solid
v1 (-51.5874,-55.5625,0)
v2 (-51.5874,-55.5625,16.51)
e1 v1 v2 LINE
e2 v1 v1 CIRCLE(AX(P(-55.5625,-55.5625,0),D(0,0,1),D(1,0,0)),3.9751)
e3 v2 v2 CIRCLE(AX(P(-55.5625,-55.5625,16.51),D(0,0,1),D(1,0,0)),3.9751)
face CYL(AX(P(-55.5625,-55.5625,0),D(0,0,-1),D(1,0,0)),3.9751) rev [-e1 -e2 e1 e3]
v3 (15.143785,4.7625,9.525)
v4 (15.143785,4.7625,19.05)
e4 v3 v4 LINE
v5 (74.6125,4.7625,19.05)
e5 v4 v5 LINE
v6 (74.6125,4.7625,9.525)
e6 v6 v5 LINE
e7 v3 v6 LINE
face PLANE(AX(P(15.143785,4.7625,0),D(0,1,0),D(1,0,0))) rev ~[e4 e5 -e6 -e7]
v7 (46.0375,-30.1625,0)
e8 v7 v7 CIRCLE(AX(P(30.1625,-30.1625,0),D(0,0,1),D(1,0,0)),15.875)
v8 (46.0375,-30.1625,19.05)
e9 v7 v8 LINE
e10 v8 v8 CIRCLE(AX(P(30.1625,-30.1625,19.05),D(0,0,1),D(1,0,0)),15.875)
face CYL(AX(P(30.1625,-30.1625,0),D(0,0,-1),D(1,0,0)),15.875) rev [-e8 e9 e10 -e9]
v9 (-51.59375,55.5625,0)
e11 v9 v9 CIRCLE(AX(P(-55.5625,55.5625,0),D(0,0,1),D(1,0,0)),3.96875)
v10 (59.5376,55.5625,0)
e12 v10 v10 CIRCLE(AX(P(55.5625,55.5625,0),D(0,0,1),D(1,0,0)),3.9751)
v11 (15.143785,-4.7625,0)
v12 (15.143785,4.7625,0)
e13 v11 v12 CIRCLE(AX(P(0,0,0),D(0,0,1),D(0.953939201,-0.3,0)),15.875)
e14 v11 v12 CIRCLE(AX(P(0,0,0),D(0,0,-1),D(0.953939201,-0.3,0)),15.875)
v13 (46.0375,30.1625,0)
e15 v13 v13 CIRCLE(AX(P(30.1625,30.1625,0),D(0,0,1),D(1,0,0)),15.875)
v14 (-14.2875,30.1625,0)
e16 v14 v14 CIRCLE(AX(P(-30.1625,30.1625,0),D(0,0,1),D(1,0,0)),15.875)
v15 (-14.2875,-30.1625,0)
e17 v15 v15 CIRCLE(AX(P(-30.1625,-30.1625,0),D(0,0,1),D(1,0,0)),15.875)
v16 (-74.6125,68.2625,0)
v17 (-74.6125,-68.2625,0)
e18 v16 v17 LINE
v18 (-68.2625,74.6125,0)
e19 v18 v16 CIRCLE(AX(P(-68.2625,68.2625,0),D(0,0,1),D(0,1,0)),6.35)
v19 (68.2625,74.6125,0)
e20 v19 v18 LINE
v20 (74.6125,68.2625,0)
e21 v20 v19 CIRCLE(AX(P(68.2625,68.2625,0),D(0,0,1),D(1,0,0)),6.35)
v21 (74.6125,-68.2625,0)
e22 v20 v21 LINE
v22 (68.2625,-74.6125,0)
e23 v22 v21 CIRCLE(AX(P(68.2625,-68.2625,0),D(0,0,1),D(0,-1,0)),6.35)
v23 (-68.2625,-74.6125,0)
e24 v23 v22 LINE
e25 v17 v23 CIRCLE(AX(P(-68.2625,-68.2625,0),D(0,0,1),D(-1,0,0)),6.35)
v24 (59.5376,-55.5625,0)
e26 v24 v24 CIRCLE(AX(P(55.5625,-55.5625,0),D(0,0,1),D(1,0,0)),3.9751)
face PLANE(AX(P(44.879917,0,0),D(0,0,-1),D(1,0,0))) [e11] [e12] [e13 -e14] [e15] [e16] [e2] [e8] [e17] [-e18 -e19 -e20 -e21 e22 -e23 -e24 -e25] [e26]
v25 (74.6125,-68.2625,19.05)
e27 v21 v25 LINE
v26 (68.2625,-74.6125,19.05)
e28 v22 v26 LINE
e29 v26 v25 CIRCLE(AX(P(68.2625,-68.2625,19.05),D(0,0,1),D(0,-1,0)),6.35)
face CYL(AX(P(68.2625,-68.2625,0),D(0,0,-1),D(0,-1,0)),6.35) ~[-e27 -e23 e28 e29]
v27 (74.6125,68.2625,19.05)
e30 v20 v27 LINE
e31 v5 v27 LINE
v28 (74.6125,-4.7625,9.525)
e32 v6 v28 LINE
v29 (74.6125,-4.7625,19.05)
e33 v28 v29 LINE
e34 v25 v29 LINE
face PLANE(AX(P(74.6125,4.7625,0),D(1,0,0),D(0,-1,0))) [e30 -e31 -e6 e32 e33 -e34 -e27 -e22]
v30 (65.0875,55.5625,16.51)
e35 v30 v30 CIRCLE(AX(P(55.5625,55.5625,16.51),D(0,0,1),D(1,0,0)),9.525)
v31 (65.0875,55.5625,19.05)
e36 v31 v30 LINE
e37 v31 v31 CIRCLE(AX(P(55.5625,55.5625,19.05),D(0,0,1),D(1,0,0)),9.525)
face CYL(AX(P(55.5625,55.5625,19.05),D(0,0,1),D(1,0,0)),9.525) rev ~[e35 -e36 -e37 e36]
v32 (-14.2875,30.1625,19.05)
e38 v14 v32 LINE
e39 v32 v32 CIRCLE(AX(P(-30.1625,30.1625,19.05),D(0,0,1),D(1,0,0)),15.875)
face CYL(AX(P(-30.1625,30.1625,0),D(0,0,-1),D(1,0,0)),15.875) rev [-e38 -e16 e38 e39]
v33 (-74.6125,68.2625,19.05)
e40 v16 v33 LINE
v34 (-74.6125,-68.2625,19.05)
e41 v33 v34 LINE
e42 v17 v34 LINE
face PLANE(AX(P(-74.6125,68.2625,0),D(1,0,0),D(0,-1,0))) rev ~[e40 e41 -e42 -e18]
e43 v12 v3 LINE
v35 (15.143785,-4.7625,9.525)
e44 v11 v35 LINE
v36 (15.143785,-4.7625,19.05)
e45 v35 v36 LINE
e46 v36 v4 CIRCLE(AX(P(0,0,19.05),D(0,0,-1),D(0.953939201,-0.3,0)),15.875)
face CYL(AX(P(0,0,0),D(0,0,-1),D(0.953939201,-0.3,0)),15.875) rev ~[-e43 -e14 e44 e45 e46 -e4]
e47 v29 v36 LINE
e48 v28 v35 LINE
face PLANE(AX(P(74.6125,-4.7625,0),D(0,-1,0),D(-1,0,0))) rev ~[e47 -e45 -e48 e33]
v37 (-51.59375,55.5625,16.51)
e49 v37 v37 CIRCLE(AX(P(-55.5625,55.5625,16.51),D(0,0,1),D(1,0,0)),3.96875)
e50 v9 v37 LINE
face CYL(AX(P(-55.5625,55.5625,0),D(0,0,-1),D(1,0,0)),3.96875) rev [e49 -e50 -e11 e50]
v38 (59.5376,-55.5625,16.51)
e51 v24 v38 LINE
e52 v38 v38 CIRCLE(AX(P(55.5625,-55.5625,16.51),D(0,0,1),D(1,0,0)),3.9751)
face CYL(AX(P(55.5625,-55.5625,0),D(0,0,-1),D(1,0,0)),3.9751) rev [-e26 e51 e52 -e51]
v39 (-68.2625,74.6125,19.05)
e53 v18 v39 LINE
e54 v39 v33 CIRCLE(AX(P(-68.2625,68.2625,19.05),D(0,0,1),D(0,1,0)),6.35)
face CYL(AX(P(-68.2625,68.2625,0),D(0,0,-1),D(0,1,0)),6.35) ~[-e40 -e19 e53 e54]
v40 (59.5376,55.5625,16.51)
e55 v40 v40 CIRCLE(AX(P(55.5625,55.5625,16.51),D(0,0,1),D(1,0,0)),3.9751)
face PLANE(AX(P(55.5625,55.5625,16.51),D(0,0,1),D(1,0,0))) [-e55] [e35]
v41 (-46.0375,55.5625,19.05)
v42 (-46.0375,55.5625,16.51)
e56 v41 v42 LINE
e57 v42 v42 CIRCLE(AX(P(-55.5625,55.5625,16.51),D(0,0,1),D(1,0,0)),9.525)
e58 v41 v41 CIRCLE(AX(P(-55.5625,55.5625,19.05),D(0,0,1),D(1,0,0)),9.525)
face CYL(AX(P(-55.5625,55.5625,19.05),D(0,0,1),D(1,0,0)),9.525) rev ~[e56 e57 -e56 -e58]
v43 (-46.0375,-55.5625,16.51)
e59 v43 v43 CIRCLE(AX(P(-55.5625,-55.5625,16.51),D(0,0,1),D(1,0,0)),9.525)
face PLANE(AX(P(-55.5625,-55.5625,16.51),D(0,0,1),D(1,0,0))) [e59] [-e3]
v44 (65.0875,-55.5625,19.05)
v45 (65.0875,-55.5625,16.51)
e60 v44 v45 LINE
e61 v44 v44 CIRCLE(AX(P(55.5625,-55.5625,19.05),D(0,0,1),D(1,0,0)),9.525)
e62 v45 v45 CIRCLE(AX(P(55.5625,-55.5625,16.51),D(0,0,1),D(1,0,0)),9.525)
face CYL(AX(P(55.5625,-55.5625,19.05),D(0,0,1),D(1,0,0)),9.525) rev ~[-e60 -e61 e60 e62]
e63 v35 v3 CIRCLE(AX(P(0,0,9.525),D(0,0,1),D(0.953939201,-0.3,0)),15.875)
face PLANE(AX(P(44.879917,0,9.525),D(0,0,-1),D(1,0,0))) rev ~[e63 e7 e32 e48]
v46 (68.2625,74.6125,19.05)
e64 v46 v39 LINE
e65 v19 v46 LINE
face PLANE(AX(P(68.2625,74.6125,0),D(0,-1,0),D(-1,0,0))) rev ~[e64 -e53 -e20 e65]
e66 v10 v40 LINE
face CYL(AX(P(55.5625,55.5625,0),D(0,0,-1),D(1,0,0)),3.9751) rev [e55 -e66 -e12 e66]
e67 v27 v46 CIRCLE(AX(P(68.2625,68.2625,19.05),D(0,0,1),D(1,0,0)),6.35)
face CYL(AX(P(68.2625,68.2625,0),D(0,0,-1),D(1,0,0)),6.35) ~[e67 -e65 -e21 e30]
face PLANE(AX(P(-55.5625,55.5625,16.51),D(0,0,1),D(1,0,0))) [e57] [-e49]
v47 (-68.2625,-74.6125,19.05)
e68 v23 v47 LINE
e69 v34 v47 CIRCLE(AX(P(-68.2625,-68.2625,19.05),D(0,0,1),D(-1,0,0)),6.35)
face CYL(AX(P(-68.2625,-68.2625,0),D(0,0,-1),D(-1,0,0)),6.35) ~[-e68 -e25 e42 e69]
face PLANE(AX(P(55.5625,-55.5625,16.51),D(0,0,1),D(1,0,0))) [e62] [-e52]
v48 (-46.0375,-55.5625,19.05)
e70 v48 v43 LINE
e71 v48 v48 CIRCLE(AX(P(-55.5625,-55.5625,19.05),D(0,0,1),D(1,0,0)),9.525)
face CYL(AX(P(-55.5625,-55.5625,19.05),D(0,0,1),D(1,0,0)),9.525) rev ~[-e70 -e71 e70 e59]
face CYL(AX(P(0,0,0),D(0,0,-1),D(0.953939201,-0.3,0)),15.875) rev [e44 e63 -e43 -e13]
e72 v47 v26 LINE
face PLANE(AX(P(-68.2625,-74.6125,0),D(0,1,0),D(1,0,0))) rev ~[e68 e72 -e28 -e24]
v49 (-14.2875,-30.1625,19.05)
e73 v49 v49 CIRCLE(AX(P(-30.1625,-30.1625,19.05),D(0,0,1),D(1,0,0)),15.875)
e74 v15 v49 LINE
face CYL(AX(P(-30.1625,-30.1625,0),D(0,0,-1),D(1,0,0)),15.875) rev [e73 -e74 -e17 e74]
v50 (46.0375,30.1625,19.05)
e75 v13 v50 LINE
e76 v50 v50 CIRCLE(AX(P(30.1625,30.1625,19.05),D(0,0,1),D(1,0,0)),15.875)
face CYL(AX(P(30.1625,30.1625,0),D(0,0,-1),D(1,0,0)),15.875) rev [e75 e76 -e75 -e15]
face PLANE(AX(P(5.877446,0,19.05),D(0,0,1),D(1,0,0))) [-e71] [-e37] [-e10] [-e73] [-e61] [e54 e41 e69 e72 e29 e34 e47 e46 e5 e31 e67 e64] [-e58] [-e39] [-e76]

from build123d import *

# Parameters (mm, degrees)
F0_R     = 3.9751
F0_R_2   = 15.875
F0_R_3   = 3.96875
F1_DEPTH = 19.05
F3_DEPTH = 9.525
F5_R     = 9.525
F5_R_2   = 3.9751
F5_R_3   = 3.96875
F6_DEPTH = 2.54


# Not quite as in the source:
# - a feature of the source that left no trace in its solid (it failed there, or was rolled back) is left out


with BuildPart() as f1:
    # F0 (on Top) → F1 (new body)
    with BuildSketch(Plane.XY):
        with BuildLine():
            Line((-68.2625, -74.6125), (68.2625, -74.6125))
            ThreePointArc((68.2625, -74.6125), (72.7526280605, -72.7526280605), (74.6125, -68.2625))
            Line((74.6125, -68.2625), (74.6125, -4.7625))
            Line((74.6125, -4.7625), (15.1437848225, -4.7625))
            ThreePointArc((15.1437848225, -4.7625), (-15.875, 0), (15.1437848225, 4.7625))
            Line((15.1437848225, 4.7625), (74.6125, 4.7625))
            Line((74.6125, 4.7625), (74.6125, 68.2625))
            ThreePointArc((74.6125, 68.2625), (72.7526280605, 72.7526280605), (68.2625, 74.6125))
            Line((68.2625, 74.6125), (-68.2625, 74.6125))
            ThreePointArc((-68.2625, 74.6125), (-72.7526280605, 72.7526280605), (-74.6125, 68.2625))
            Line((-74.6125, 68.2625), (-74.6125, -68.2625))
            ThreePointArc((-74.6125, -68.2625), (-72.7526280605, -72.7526280605), (-68.2625, -74.6125))
        make_face()
        with Locations((-55.5625, -55.5625)):
            Circle(F0_R, mode=Mode.SUBTRACT)
        with Locations((-30.1625, -30.1625)):
            Circle(F0_R_2, mode=Mode.SUBTRACT)
        with Locations((55.5625, -55.5625)):
            Circle(F0_R, mode=Mode.SUBTRACT)
        with Locations((30.1625, -30.1625)):
            Circle(F0_R_2, mode=Mode.SUBTRACT)
        with Locations((-30.1625, 30.1625)):
            Circle(F0_R_2, mode=Mode.SUBTRACT)
        with Locations((-55.5625, 55.5625)):
            Circle(F0_R_3, mode=Mode.SUBTRACT)
        with Locations((30.1625, 30.1625)):
            Circle(F0_R_2, mode=Mode.SUBTRACT)
        with Locations((55.5625, 55.5625)):
            Circle(F0_R, mode=Mode.SUBTRACT)
    extrude(amount=F1_DEPTH)

    # F2 (on face) → F3 (join)
    with BuildSketch(Plane(origin=(0, 0, 0), x_dir=(1, 0, 0), z_dir=(0, 0, -1))):
        with BuildLine():
            Line((74.6125, 4.7625), (15.1437848225, 4.7625))
            ThreePointArc((15.1437848225, 4.7625), (15.875, 0), (15.1437848225, -4.7625))
            Line((15.1437848225, -4.7625), (74.6125, -4.7625))
            Line((74.6125, -4.7625), (74.6125, 4.7625))
        make_face()
    extrude(amount=-F3_DEPTH)

    # F5 (on face) → F6 (cut)
    with BuildSketch(Plane.XY.offset(19.05)):
        with Locations((-55.5625, -55.5625)):
            Circle(F5_R)
        with Locations((-55.5625, -55.5625)):
            Circle(F5_R_2, mode=Mode.SUBTRACT)
        with Locations((55.5625, -55.5625)):
            Circle(F5_R)
        with Locations((55.5625, -55.5625)):
            Circle(F5_R_2, mode=Mode.SUBTRACT)
        with Locations((55.5625, 55.5625)):
            Circle(F5_R)
        with Locations((55.5625, 55.5625)):
            Circle(F5_R_2, mode=Mode.SUBTRACT)
        with Locations((-55.5625, 55.5625)):
            Circle(F5_R)
        with Locations((-55.5625, 55.5625)):
            Circle(F5_R_3, mode=Mode.SUBTRACT)
    extrude(amount=-F6_DEPTH, mode=Mode.SUBTRACT)


solid = f1.part
